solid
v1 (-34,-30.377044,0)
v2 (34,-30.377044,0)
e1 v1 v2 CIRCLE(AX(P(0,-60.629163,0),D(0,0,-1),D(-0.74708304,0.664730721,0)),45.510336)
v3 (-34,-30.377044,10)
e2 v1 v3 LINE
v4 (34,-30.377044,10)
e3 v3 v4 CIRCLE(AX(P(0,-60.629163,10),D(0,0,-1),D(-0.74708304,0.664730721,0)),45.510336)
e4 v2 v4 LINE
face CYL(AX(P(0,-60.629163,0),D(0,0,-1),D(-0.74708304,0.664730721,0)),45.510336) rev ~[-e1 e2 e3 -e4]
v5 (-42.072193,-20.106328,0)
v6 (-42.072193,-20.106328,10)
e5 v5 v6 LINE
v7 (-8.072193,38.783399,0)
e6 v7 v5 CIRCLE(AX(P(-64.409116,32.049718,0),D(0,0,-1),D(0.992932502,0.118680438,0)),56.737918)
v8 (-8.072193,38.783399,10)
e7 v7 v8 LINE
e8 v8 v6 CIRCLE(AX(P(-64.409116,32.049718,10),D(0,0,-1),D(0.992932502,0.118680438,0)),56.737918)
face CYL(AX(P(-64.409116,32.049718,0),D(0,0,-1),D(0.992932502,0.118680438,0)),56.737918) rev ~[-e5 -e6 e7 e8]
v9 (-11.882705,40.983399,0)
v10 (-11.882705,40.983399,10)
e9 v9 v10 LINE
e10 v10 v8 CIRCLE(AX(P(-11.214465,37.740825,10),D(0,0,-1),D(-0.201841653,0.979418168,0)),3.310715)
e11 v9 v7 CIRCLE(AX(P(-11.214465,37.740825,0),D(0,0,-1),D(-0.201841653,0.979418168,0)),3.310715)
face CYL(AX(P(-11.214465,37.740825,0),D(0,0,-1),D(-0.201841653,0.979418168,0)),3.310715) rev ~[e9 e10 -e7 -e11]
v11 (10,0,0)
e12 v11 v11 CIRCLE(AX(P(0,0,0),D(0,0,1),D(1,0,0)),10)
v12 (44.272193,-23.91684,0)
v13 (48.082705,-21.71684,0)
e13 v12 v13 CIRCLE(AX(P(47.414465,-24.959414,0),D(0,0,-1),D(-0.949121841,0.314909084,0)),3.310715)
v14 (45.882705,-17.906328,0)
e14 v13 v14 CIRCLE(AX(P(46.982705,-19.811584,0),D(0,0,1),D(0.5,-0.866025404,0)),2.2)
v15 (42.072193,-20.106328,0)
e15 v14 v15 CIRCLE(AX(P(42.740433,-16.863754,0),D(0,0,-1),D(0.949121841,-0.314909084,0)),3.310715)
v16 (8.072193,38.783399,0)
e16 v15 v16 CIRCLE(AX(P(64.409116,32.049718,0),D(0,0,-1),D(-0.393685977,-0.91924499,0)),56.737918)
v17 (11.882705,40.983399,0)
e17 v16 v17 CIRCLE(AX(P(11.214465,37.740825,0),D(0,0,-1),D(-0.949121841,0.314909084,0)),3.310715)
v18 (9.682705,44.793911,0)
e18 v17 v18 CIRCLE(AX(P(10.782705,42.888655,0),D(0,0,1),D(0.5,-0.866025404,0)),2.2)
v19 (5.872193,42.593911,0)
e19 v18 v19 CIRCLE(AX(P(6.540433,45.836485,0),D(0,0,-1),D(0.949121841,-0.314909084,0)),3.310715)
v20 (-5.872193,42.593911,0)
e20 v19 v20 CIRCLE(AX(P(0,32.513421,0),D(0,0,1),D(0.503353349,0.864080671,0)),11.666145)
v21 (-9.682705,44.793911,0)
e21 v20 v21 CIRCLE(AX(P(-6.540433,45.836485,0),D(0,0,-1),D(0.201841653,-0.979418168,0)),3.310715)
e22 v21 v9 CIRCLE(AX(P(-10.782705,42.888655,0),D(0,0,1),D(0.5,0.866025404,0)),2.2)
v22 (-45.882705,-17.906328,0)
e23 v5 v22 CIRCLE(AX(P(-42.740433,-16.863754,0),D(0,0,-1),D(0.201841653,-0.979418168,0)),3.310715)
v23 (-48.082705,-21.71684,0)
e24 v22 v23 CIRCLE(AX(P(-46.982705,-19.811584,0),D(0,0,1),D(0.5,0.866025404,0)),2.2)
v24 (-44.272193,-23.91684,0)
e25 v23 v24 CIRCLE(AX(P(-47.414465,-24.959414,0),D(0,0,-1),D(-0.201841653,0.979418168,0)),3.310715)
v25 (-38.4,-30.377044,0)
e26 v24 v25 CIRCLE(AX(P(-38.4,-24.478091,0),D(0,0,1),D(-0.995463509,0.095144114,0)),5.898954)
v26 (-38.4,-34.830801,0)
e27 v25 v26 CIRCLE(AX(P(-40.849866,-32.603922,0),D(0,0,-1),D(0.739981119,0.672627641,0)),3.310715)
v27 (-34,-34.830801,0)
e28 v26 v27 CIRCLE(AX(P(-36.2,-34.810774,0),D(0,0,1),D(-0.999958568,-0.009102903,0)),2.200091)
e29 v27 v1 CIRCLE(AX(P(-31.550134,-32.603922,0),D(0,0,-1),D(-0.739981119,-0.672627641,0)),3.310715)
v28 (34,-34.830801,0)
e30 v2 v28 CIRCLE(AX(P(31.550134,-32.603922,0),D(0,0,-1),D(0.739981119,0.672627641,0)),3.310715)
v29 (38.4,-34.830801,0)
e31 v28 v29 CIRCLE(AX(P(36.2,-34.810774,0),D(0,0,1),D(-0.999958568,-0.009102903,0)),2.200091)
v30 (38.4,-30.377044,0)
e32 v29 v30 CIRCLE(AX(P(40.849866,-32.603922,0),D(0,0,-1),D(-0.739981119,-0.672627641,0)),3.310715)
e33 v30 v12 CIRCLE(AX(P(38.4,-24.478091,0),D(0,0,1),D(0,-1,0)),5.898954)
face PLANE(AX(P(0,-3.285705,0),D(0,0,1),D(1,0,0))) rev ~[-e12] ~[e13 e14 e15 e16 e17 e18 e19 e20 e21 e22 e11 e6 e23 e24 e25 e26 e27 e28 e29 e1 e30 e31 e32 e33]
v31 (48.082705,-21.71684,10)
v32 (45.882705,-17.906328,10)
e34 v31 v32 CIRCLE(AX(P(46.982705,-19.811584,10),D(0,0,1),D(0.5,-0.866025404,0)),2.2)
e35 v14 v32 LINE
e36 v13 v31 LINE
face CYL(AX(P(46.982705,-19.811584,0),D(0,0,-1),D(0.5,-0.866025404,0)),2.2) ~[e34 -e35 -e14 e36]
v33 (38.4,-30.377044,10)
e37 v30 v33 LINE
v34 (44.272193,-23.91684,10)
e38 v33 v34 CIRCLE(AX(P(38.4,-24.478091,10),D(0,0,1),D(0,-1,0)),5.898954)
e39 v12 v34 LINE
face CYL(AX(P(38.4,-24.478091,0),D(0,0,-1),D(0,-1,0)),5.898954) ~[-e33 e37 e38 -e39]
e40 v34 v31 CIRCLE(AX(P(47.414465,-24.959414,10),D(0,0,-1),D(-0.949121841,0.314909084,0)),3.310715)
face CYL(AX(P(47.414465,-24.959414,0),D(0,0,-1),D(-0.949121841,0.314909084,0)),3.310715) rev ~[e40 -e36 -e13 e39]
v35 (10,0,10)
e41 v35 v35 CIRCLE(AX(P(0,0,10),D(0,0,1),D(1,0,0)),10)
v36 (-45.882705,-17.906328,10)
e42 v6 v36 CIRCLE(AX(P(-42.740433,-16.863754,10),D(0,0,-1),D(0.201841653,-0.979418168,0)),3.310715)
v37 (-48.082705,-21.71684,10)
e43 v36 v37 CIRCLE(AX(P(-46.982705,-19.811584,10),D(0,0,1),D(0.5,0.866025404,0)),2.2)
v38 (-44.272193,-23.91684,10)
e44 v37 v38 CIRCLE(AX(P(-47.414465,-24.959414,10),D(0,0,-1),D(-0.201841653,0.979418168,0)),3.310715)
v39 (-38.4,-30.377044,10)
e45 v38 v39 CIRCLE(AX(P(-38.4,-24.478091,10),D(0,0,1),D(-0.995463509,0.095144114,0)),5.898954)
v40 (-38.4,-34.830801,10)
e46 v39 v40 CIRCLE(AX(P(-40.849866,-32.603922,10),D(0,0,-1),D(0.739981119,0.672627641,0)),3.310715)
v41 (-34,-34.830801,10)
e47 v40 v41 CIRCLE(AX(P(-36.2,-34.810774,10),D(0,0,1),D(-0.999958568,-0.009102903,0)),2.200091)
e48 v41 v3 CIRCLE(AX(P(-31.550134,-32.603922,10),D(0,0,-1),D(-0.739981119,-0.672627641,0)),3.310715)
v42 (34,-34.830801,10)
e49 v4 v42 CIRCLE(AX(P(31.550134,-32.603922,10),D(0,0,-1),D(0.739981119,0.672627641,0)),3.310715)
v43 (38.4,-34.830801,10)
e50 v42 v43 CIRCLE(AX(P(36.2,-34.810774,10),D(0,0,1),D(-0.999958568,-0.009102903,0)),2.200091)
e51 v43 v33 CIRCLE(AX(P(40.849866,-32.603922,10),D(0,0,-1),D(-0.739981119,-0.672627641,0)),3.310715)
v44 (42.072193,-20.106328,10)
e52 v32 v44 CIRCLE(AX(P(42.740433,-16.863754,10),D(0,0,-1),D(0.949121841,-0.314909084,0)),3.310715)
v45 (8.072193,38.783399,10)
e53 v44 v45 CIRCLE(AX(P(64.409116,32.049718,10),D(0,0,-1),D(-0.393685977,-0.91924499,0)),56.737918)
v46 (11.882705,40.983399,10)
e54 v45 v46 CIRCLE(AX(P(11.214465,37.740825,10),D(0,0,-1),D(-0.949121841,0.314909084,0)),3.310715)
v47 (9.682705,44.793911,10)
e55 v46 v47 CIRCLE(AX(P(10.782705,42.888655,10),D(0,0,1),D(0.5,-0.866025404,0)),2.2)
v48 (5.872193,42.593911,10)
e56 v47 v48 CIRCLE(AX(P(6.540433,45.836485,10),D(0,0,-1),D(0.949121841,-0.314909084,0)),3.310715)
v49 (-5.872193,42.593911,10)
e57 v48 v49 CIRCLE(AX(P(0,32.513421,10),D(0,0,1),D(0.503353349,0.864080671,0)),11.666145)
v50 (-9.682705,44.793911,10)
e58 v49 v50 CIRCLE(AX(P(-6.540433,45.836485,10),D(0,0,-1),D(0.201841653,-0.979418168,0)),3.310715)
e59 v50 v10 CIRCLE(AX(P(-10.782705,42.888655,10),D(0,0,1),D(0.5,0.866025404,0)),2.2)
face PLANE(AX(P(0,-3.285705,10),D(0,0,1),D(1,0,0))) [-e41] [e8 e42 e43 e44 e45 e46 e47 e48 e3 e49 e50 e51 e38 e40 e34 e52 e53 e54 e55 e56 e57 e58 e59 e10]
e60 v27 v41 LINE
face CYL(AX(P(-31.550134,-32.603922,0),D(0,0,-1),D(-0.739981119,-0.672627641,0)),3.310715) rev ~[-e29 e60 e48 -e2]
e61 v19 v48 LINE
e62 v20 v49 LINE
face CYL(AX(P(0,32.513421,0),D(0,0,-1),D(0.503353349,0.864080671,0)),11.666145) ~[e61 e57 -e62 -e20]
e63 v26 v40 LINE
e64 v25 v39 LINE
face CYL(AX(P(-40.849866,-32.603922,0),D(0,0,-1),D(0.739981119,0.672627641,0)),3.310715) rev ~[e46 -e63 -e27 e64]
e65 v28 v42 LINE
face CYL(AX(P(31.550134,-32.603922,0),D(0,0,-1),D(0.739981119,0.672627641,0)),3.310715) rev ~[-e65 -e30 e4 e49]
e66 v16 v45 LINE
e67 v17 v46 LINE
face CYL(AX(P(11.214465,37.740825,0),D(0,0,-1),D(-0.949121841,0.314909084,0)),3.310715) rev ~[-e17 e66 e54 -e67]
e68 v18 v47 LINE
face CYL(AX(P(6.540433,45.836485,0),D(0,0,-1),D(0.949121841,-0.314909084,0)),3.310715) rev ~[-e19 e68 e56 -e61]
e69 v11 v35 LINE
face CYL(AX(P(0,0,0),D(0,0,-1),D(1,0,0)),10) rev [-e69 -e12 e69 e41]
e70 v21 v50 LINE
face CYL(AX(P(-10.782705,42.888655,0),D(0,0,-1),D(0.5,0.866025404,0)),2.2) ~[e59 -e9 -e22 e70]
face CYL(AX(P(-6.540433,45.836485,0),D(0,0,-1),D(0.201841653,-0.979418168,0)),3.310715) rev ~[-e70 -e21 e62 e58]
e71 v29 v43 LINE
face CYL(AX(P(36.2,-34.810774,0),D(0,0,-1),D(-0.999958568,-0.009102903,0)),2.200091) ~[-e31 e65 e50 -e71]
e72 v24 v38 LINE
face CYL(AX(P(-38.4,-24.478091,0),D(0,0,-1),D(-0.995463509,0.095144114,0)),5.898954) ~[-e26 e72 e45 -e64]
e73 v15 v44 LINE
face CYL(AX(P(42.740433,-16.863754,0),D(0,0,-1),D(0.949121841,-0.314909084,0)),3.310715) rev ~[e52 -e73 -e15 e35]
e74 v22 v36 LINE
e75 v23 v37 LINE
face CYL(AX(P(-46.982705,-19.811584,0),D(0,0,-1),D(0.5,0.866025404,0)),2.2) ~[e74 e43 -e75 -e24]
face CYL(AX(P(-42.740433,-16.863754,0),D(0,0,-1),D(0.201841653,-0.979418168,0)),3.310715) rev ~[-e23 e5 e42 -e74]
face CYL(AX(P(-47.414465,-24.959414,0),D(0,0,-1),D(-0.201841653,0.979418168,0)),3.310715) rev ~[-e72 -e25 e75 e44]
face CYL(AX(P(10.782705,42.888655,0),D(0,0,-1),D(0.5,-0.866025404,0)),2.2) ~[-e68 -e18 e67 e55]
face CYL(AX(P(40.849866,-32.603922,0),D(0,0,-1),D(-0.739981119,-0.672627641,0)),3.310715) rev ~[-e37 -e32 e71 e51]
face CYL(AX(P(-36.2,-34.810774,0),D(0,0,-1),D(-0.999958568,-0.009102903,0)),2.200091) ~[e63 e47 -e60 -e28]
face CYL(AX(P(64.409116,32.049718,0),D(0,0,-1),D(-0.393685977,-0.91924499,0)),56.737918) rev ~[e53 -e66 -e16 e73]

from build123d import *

# Parameters (mm, degrees)
F0_R     = 15
F0_R_2   = 10
F1_DEPTH = 10


# Not quite as in the source:
# - a feature names something its author has since deleted; it is built from what else it names


with BuildPart() as f1:
    # F0 (on Top) → F1 (new body)
    with BuildSketch(Plane.XY):
        with BuildLine():
            ThreePointArc((42.0721931458, -20.106328072), (15.2726376348, 3.6807596445), (8.0721931458, 38.7833993854))
            ThreePointArc((8.0721931458, 38.7833993854), (9.5591074328, 40.6079882936), (11.8827049224, 40.9833993854))
            ThreePointArc((11.8827049224, 40.9833993854), (12.6879608107, 43.9886552737), (9.6827049224, 44.793911162))
            ThreePointArc((9.6827049224, 44.793911162), (8.1957906353, 42.9693222537), (5.8721931458, 42.593911162))
            ThreePointArc((5.8721931458, 42.593911162), (0, 44.17956576), (-5.8721931458, 42.593911162))
            ThreePointArc((-5.8721931458, 42.593911162), (-8.1957906353, 42.9693222537), (-9.6827049224, 44.793911162))
            ThreePointArc((-9.6827049224, 44.793911162), (-12.6879608107, 43.9886552737), (-11.8827049224, 40.9833993854))
            ThreePointArc((-11.8827049224, 40.9833993854), (-9.5591074328, 40.6079882936), (-8.0721931458, 38.7833993854))
            ThreePointArc((-8.0721931458, 38.7833993854), (-15.2726376348, 3.6807596445), (-42.0721931458, -20.106328072))
            ThreePointArc((-42.0721931458, -20.106328072), (-44.3957906353, -19.7309169803), (-45.8827049224, -17.906328072))
            ThreePointArc((-45.8827049224, -17.906328072), (-48.8879608107, -18.7115839603), (-48.0827049224, -21.7168398486))
            ThreePointArc((-48.0827049224, -21.7168398486), (-45.7591074328, -22.0922509404), (-44.2721931458, -23.9168398486))
            ThreePointArc((-44.2721931458, -23.9168398486), (-42.7651143596, -28.4458898793), (-38.4, -30.3770442686))
            ThreePointArc((-38.4, -30.3770442686), (-37.5391516656, -32.6039224965), (-38.4, -34.8308007245))
            ThreePointArc((-38.4, -34.8308007245), (-36.2, -37.010864664), (-34, -34.8308007245))
            ThreePointArc((-34, -34.8308007245), (-34.8608483344, -32.6039224965), (-34, -30.3770442686))
            ThreePointArc((-34, -30.3770442686), (0, -15.1188267986), (34, -30.3770442686))
            ThreePointArc((34, -30.3770442686), (34.8608483344, -32.6039224965), (34, -34.8308007245))
            ThreePointArc((34, -34.8308007245), (36.2, -37.010864664), (38.4, -34.8308007245))
            ThreePointArc((38.4, -34.8308007245), (37.5391516656, -32.6039224965), (38.4, -30.3770442686))
            ThreePointArc((38.4, -30.3770442686), (42.7651143596, -28.4458898793), (44.2721931458, -23.9168398486))
            ThreePointArc((44.2721931458, -23.9168398486), (45.7591074328, -22.0922509404), (48.0827049224, -21.7168398486))
            ThreePointArc((48.0827049224, -21.7168398486), (48.8879608107, -18.7115839603), (45.8827049224, -17.906328072))
            ThreePointArc((45.8827049224, -17.906328072), (44.3957906353, -19.7309169803), (42.0721931458, -20.106328072))
        make_face()
        Circle(F0_R, mode=Mode.SUBTRACT)
        Circle(F0_R)
        Circle(F0_R_2, mode=Mode.SUBTRACT)
    extrude(amount=F1_DEPTH)


solid = f1.part
